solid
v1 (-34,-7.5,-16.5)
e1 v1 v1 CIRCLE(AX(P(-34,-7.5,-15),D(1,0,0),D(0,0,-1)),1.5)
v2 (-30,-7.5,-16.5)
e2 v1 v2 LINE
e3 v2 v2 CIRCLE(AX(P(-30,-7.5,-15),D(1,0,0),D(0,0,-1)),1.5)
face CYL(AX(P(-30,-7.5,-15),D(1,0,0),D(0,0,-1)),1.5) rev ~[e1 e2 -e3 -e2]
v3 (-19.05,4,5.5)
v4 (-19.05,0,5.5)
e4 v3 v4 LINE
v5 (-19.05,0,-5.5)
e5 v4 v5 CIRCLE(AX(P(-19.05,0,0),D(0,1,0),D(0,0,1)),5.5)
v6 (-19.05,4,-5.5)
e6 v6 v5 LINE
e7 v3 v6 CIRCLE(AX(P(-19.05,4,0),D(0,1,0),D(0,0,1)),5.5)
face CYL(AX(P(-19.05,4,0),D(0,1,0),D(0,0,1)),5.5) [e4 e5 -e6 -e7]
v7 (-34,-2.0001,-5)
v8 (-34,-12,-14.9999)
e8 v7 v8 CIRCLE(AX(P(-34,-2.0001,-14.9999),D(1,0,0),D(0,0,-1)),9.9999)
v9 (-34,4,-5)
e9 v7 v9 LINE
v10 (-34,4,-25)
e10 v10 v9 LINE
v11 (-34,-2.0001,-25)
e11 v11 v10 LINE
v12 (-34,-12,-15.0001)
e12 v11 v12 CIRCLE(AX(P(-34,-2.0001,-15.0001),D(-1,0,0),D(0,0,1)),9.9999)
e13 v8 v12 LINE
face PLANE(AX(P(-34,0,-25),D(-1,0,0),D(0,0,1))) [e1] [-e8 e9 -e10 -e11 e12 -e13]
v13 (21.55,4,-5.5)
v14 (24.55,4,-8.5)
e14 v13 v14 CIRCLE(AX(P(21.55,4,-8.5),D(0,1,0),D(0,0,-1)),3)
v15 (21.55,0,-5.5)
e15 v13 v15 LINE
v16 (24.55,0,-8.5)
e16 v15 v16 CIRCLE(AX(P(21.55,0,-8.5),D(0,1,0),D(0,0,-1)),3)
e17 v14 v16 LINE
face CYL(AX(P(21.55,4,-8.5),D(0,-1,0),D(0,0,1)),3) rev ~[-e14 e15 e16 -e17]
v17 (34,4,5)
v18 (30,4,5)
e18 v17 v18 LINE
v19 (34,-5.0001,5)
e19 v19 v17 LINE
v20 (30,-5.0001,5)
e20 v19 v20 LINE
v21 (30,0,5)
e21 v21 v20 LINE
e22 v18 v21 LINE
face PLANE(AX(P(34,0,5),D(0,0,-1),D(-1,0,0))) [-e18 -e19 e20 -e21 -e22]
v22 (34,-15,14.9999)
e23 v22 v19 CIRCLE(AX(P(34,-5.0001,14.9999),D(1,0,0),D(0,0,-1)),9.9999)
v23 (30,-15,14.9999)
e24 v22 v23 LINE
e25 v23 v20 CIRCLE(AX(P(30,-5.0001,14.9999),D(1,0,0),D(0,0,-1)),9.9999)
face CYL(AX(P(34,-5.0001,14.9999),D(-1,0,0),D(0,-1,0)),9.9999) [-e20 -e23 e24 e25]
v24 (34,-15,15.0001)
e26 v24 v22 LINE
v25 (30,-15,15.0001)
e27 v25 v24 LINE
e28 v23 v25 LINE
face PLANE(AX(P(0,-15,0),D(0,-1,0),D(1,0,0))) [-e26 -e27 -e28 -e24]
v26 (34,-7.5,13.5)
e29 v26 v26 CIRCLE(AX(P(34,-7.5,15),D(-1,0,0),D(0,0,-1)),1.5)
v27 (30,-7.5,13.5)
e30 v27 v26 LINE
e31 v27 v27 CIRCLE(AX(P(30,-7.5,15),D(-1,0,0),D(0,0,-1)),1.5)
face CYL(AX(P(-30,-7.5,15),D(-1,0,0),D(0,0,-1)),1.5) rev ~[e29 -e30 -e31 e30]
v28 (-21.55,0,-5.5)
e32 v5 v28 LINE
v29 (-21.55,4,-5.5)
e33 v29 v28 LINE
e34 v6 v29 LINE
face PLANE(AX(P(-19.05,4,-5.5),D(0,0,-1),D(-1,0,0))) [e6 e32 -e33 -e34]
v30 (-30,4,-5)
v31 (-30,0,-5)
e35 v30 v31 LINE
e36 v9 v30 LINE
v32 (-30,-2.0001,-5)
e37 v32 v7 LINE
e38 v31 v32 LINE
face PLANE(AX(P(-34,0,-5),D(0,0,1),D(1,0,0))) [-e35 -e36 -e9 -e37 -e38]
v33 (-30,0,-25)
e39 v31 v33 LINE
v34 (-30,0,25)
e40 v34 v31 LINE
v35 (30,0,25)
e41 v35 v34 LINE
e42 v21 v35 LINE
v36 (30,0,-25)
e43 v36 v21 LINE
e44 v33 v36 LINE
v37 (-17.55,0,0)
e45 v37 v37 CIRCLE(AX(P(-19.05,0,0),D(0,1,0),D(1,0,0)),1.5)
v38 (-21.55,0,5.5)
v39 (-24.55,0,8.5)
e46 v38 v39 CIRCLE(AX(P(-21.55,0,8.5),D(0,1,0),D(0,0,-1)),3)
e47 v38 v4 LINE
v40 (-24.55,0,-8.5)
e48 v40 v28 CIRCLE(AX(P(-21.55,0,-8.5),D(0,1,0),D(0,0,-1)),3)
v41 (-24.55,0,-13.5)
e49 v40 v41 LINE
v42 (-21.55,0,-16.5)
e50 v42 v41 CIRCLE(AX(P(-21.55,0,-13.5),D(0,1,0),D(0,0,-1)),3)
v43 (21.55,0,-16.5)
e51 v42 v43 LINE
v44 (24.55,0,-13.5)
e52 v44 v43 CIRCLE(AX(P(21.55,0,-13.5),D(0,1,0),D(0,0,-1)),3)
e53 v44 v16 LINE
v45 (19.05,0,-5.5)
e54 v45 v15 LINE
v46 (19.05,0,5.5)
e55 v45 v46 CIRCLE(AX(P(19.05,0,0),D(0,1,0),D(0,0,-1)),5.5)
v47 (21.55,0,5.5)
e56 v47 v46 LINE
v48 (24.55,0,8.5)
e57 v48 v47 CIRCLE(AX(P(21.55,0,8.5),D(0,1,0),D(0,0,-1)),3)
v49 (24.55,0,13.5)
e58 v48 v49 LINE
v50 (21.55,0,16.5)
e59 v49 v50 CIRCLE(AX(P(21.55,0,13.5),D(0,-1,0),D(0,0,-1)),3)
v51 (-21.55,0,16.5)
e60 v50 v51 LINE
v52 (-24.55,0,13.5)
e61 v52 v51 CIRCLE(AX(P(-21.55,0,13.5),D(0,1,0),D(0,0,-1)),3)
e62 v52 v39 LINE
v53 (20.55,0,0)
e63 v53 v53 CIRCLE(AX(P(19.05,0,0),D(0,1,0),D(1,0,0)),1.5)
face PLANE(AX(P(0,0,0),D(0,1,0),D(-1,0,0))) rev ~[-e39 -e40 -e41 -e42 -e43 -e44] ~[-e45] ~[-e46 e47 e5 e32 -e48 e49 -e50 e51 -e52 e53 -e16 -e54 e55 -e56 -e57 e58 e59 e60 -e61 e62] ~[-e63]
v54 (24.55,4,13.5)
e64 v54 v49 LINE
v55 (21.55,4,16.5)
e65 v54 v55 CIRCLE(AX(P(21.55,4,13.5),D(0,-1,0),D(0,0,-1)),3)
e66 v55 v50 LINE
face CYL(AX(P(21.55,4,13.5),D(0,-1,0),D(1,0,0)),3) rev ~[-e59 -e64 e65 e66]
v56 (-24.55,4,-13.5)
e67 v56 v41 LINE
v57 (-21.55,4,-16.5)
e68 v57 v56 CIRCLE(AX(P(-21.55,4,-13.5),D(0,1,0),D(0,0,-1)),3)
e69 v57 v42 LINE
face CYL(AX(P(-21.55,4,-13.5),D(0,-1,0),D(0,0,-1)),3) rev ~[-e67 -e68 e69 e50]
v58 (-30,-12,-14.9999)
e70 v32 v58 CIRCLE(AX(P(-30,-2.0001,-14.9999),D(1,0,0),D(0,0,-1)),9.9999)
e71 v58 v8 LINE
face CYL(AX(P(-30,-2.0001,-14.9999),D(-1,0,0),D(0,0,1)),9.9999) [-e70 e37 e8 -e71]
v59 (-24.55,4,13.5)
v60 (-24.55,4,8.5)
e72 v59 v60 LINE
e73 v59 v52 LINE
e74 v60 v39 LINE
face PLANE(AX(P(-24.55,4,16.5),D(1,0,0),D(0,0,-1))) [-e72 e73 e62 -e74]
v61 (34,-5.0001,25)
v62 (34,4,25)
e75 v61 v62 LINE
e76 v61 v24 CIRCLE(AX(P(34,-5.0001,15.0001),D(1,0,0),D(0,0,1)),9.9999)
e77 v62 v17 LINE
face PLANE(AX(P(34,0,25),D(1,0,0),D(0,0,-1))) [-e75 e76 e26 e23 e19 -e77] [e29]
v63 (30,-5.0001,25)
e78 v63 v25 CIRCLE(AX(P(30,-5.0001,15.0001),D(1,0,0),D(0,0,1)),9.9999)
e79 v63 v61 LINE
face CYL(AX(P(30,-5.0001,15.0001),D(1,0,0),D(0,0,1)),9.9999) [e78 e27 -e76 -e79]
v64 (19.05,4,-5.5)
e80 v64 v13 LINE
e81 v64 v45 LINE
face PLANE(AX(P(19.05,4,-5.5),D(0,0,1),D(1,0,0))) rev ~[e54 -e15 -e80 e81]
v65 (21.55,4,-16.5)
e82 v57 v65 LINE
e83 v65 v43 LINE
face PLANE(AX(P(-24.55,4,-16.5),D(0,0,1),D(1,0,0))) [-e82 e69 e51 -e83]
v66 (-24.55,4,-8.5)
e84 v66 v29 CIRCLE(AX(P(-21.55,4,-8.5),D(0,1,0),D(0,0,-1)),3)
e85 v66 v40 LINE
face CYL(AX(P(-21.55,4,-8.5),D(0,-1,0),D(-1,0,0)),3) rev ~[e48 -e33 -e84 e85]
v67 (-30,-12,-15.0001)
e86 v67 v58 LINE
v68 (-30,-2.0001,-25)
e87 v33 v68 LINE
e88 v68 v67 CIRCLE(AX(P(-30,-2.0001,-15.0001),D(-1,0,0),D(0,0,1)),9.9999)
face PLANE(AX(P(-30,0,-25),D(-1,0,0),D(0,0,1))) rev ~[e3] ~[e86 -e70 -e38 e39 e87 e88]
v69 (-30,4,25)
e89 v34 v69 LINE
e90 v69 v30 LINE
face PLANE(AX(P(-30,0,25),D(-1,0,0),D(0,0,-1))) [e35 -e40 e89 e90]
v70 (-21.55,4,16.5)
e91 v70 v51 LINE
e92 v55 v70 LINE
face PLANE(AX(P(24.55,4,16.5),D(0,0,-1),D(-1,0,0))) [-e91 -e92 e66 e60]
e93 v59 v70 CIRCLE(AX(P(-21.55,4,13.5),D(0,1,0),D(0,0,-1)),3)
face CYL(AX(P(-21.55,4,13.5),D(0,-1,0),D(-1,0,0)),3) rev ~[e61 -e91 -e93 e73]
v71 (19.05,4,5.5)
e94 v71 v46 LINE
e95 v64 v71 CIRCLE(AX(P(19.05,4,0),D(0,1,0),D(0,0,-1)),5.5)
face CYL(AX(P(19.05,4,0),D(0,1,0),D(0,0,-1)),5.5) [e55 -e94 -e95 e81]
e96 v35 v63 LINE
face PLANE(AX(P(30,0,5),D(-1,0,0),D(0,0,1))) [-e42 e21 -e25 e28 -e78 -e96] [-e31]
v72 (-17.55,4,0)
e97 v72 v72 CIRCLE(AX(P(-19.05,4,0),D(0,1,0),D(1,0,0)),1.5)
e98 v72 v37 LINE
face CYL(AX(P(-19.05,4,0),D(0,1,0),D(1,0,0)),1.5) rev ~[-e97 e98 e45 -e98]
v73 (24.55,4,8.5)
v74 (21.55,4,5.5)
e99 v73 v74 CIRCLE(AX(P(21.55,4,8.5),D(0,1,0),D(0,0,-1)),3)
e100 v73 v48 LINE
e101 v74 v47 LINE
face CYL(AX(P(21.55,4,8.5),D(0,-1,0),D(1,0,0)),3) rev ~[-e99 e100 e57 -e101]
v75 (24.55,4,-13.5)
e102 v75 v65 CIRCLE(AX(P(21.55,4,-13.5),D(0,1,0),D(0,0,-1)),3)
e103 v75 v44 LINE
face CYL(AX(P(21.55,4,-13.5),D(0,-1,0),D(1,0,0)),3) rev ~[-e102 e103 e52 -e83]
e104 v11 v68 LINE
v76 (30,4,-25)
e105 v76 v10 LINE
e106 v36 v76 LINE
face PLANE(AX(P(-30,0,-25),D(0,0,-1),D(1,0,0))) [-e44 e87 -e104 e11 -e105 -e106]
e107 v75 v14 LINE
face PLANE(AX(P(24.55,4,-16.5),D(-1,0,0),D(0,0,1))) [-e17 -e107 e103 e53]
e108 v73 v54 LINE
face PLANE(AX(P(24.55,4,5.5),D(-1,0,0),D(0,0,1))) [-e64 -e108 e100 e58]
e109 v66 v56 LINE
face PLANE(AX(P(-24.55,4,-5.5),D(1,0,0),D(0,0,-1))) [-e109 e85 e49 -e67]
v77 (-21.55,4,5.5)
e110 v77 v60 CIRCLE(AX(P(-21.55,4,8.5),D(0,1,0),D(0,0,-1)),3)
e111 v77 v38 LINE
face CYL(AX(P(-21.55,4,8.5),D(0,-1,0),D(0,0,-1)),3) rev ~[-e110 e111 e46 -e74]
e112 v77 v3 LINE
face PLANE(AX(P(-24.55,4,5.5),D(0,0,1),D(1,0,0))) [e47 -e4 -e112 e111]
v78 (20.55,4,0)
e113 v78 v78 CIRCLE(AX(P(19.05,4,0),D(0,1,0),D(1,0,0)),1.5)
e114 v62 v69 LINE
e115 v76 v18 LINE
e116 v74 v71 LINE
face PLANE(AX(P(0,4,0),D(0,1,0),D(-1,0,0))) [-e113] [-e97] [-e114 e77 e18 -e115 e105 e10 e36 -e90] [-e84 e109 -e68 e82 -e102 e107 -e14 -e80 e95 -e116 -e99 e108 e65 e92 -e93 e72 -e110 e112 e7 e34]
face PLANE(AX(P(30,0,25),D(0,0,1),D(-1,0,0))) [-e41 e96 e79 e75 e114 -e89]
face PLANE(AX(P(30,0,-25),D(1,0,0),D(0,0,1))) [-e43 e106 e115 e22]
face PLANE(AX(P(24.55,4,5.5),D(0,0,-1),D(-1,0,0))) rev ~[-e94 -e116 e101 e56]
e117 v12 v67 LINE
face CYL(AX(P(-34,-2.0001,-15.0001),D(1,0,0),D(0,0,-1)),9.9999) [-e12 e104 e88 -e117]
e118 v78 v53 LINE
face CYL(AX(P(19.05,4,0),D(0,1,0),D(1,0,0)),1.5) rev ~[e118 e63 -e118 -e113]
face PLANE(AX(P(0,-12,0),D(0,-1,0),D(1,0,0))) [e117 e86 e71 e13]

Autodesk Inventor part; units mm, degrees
ref_plane "YZ Plane" through (0, 0, 0) normal (1, 0, 0) x (0, 1, 0)
ref_plane "XZ Plane" through (0, 0, 0) normal (0, 1, 0) x (-1, 0, 0)
ref_plane "XY Plane" through (0, 0, 0) normal (0, 0, 1) x (1, 0, 0)
sketch "Sketch1" plane through (0, 0, 0) normal (0, 1, 0) x (-1, 0, 0)
  line L0 (-30, 25) -> (30, 25)
  line L1 (30, 25) -> (30, -25)
  line L2 (30, -25) -> (-30, -25)
  line L3 (-30, -25) -> (-30, 25)
  line L4 (-30, 25) -> (30, -25) construction
  line L5 (30, 25) -> (-30, -25) construction
  point P0 (0, 0)
  dimension "d0" = 60
  dimension "d1" = 50
extrude "Extrusion1" add sketch "Sketch1" along normal blind 4
sketch "Sketch2" plane through (0, 4, 0) normal (0, 1, 0) x (1, 0, 0)
  line L0 (24.55, -16.5) -> (-24.55, -16.5)
  line L1 (-24.55, -16.5) -> (-24.55, 16.5)
  line L2 (-24.55, 16.5) -> (24.55, 16.5)
  line L3 (24.55, 16.5) -> (24.55, -16.5)
  line L4 (24.55, -16.5) -> (-24.55, 16.5) construction
  line L5 (-24.55, -16.5) -> (24.55, 16.5) construction
  line L6 (-24.55, 0) -> (-19.05, 0) construction
  arc A0 (-19.05, -5.5) -> (-19.05, 5.5) centre (-19.05, 0) ccw
  circle A1 centre (-19.05, 0) radius 1.5
  line L7 (-24.55, -5.5) -> (-19.05, -5.5)
  line L8 (-19.05, 5.5) -> (-24.55, 5.5)
  line L9 (0, 0) -> (0, 7.8655) construction
  arc A2 (19.05, 5.5) -> (19.05, -5.5) centre (19.05, 0) ccw
  circle A3 centre (19.05, 0) radius 1.5
  line L10 (24.55, -5.5) -> (19.05, -5.5)
  line L11 (19.05, 5.5) -> (24.55, 5.5)
  point P0 (0, 0)
  dimension "d4" = 49.1
  dimension "d5" = 33
  dimension "d6" = 5.5
  dimension "d7" = 3
extrude "Extrusion2" cut sketch "Sketch2" against normal through all contours L0 L1 L7 A0 L8 L2 L3 L11 A2 L10 | A1 | A3
sketch "Sketch3" plane through (0, 0, 0) normal (0, -1, 0) x (1, 0, 0)
  line L0 (-30, 25) -> (30, 25) projected
  line L1 (-30, 25) -> (-34, 25)
  line L2 (-34, 25) -> (-34, 5)
  line L3 (-34, 5) -> (-30, 5)
  line L4 (-30, 5) -> (-30, 25)
  line L5 (-34, 25) -> (-10, 25)
  line L6 (-10, 25) -> (-10, 29)
  line L7 (-10, 29) -> (-34, 29)
  line L8 (-34, 29) -> (-34, 25)
  line L9 (-30, -25) -> (-30, 25) projected
  line L10 (-30, 0) -> (-43.5069, 0) construction
  line L11 (-30, -25) -> (-34, -25)
  line L12 (-34, -25) -> (-34, -5)
  line L13 (-34, -5) -> (-30, -5)
  line L14 (-30, -5) -> (-30, -25)
  line L15 (-34, -25) -> (-10, -25)
  line L16 (-10, -25) -> (-10, -29)
  line L17 (-10, -29) -> (-34, -29)
  line L18 (-34, -29) -> (-34, -25)
  line L19 (0, 25) -> (0, 63.1817) construction
  line L20 (30, 25) -> (34, 25)
  line L21 (34, 25) -> (34, 5)
  line L22 (34, 5) -> (30, 5)
  line L23 (30, 5) -> (30, 25)
  line L24 (34, 25) -> (10, 25)
  line L25 (10, 25) -> (10, 29)
  line L26 (10, 29) -> (34, 29)
  line L27 (34, 29) -> (34, 25)
  line L28 (30, -25) -> (30, 25)
  line L29 (30, 0) -> (43.5069, 0) construction
  line L30 (30, -25) -> (34, -25)
  line L31 (34, -25) -> (34, -5)
  line L32 (34, -5) -> (30, -5)
  line L33 (30, -5) -> (30, -25)
  line L34 (34, -25) -> (10, -25)
  line L35 (10, -25) -> (10, -29)
  line L36 (10, -29) -> (34, -29)
  line L37 (34, -29) -> (34, -25)
  line L38 (30, -25) -> (30, -29)
  line L39 (30, 25) -> (30, 29)
  point P0 (0, 0)
  point P1 (-30, -25)
  point P2 (-30, -5)
  point P3 (30, -5)
  point P4 (30, -25)
  point P5 (30, -25)
  dimension "d21" = 4
  dimension "d22" = 20
  dimension "d23" = 24
  dimension "d24" = 4
extrude "Extrusion3" add sketch "Sketch3" along normal blind 15 and the other way blind 4 contours L20 L21 L22 L23 | L11 L12 L13 L9
fillet "Fillet1" radius 3 12 edges at (24.55, 2, -16.5) (24.55, 2, -5.5) (24.55, 2, 16.5) (24.55, 2, 5.5) (-24.55, 2, -16.5) (-24.55, 2, -5.5) (-24.55, 2, 5.5) (-24.55, 2, 16.5) (19.05, 2, 5.5) (19.05, 2, -5.5) (-19.05, 2, -5.5) (-19.05, 2, 5.5)
sketch "Sketch7" plane through (-30, 0, -5) normal (1, 0, 0) x (0, 0, -1)
  line L0 (0, -15) -> (20, -15) projected
  line L1 (10, -15) -> (10, 0)
  line L2 (20, 0) -> (0, 0) projected
  circle A0 centre (10, -7.5) radius 1.5
  line L3 (-5, 0) -> (-5, -12.3055)
  circle A1 centre (-20, -7.5) radius 1.5
  dimension "d47" = 3
extrude "Extrusion8" cut sketch "Sketch7" along normal through all both and the other way through all
sketch "Sketch9" plane through (0, -15, 0) normal (0, -1, 0) x (1, 0, 0)
  line L0 (-34, -5) -> (-34, -25) projected
  line L1 (-30, -25) -> (-30, -5) projected
  line L2 (-30, -5) -> (-34, -5) projected
  line L3 (-34, -25) -> (-30, -25) projected
  line L4 (-34, 5) -> (-30, 5) projected
  line L5 (-30, 5) -> (-30, 25) projected
  line L6 (-30, 25) -> (-34, 25) projected
  line L7 (-34, 25) -> (-34, 5) projected
  line L8 (30, 29) -> (10, 29) projected
  line L9 (10, 29) -> (10, 25) projected
  line L10 (10, 25) -> (30, 25) projected
  line L11 (30, 25) -> (30, 29) projected
  line L12 (10, -29) -> (30, -29) projected
  line L13 (30, -29) -> (30, -25) projected
  line L14 (30, -25) -> (10, -25) projected
  line L15 (10, -25) -> (10, -29) projected
  point P0 (0, 0)
extrude "Extrusion10" cut sketch "Sketch9" against normal blind 3
fillet "Fillet2" radius 10 4 edges at (-32, -12, -5) (-32, -12, -25) (32, -15, 5) (32, -15, 25)
properties part number "LED_mount" material "ABS Plastic"
